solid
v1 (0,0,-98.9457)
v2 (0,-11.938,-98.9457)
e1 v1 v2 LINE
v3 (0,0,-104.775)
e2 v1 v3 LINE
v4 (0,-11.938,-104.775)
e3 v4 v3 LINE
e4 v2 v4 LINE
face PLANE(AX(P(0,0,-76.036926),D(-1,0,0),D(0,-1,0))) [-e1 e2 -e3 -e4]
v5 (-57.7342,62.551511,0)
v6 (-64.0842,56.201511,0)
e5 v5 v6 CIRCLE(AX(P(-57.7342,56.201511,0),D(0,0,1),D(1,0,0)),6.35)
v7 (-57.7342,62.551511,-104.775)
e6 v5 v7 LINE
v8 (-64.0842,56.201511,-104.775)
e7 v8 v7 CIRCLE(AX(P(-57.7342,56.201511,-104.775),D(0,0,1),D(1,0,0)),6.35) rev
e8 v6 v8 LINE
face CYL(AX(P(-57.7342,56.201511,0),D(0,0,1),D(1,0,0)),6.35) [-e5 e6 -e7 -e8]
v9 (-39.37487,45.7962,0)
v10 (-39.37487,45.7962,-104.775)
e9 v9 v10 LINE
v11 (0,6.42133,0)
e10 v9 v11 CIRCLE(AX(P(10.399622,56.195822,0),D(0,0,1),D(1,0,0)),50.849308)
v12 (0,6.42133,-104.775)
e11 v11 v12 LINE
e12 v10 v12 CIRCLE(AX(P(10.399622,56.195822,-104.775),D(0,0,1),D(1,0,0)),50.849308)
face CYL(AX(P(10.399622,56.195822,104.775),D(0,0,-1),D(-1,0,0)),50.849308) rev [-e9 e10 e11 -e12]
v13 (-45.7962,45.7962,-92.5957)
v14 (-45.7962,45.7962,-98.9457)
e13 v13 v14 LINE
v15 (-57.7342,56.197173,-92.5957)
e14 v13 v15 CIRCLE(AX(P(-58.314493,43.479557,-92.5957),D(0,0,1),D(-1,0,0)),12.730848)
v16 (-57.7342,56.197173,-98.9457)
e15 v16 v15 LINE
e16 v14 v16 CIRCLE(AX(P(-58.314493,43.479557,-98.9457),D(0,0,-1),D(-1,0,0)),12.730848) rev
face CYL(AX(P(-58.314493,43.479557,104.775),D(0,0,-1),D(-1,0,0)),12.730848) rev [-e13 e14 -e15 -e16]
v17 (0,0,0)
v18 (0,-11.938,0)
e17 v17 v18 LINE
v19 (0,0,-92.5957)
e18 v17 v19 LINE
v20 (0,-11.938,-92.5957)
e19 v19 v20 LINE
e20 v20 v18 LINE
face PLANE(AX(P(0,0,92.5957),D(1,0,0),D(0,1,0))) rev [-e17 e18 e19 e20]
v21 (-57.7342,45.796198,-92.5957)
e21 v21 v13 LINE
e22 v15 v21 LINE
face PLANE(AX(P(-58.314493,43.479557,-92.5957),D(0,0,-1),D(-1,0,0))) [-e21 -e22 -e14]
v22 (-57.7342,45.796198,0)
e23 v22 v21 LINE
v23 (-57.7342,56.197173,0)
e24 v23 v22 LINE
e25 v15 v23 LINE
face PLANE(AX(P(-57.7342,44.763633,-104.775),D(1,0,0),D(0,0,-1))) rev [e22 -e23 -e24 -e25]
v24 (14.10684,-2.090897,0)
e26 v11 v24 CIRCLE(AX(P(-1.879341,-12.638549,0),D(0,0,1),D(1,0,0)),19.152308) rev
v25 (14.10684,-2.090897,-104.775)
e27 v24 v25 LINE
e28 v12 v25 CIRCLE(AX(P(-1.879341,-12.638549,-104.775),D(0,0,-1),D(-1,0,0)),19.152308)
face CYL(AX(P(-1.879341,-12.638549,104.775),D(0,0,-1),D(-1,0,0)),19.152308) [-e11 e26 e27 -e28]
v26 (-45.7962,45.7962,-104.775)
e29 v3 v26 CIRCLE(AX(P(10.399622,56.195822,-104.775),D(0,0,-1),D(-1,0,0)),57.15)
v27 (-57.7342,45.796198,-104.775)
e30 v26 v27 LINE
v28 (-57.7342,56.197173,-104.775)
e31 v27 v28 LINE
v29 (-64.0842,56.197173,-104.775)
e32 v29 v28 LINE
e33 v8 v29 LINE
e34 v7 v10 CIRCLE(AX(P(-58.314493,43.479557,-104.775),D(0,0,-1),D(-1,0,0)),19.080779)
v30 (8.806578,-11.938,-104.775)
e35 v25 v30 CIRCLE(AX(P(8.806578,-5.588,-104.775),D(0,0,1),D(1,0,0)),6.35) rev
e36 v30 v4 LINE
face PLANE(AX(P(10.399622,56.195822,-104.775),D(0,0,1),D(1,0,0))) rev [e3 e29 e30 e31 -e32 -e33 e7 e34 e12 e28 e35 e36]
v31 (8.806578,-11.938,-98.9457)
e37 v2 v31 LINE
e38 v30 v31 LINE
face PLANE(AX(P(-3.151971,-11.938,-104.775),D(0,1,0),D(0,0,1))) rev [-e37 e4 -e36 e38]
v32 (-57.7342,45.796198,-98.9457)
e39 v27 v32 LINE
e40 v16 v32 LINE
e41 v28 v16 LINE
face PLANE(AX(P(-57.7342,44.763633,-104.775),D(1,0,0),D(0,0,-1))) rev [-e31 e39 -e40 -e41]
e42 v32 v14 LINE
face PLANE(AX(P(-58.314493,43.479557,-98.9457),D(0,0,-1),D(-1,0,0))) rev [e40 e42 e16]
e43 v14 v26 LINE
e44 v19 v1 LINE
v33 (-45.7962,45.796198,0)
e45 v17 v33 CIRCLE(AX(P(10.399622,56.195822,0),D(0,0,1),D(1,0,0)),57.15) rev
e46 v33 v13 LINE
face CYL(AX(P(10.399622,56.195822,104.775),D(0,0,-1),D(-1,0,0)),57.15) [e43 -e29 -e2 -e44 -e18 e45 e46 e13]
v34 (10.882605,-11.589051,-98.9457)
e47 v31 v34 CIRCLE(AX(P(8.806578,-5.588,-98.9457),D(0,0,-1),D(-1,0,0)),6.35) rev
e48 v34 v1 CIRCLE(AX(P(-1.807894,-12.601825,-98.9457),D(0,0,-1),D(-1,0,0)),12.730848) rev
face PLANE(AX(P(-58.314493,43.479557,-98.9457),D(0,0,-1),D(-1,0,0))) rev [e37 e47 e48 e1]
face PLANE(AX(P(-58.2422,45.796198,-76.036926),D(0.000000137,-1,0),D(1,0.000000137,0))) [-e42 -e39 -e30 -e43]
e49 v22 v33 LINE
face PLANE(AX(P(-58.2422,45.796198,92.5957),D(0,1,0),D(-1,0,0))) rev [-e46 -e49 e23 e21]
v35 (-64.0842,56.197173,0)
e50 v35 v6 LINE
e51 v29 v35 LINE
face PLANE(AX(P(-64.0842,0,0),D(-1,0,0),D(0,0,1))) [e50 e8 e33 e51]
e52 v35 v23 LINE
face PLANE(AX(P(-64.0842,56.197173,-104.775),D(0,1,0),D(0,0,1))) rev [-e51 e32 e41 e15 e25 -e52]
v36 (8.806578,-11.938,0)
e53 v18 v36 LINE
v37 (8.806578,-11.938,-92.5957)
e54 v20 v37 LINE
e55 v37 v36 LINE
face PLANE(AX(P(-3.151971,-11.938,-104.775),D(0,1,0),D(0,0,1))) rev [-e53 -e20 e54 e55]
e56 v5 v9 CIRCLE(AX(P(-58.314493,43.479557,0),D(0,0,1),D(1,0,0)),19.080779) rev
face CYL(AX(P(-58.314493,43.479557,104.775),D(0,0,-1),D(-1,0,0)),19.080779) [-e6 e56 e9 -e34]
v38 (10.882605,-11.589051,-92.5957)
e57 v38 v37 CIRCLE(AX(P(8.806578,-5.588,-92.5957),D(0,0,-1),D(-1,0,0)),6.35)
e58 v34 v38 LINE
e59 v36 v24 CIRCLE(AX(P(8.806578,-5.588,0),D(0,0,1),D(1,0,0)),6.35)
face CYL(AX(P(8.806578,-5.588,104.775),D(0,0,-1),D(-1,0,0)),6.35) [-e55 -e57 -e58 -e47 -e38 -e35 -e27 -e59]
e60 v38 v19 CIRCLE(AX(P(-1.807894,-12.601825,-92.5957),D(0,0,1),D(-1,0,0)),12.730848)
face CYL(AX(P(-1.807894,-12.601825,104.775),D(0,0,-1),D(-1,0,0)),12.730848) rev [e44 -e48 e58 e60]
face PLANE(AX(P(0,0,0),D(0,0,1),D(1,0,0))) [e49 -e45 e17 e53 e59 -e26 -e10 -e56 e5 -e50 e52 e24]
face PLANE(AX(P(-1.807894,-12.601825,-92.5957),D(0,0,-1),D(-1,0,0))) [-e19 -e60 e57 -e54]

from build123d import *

# Parameters (mm, degrees)
BOSS_EXTRUDE1_DEPTH = 104.775
BOSS_EXTRUDE2_DEPTH = 92.5957
BOSS_EXTRUDE3_START = -5.8293
BOSS_EXTRUDE3_DEPTH = 5.8293
BOSS_EXTRUDE4_DEPTH = 6.35
SKETCH5_W           = 7.787485422
SKETCH5_H           = 19.833751934
SKETCH5_W_2         = 22.754058967
SKETCH5_H_2         = 3.407024872
CUT_EXTRUDE1_DEPTH  = 227.312030137
SKETCH7_W           = 89.459387911
SKETCH7_H           = 93.108081787
CUT_EXTRUDE3_DEPTH  = 104.775
SKETCH8_W           = 104.775
SKETCH8_H           = 6.354337814
BOSS_EXTRUDE5_DEPTH = 6.35
FILLET1_R           = 6.35


with BuildPart() as part:
    # Sketch1 → Boss-Extrude1 (new, symmetric)
    with BuildSketch(Plane.XY):
        with BuildLine():
            Line((-58.2422, 56.2102), (-58.2422, 62.5602))
            ThreePointArc((-58.2422, 62.5602), (-45.640852469, 57.743322347), (-39.3748699, 45.7962))
            ThreePointArc((-39.3748699, 45.7962), (-25.556268964, 20.239931036), (0, 6.4213301))
            ThreePointArc((0, 6.4213301), (12.247457496, 0.293755183), (17.272, -12.446))
            Line((17.272, -12.446), (10.922, -12.446))
            ThreePointArc((10.922, -12.446), (7.760938146, -4.204686933), (0, 0))
            ThreePointArc((0, 0), (-30.011530905, 15.784669095), (-45.7962, 45.7962))
            ThreePointArc((-45.7962, 45.7962), (-50.144819563, 53.243313205), (-58.2422, 56.2102))
        make_face()
    extrude(amount=BOSS_EXTRUDE1_DEPTH, both=True)


with BuildPart() as boss_extrude2_tool:
    # Sketch2 → Boss-Extrude2 (new, symmetric)
    with BuildSketch(Plane.XY):
        with BuildLine():
            Line((-58.2422, 56.2102), (-58.2422, 45.796198296))
            Line((-58.2422, 45.796198296), (-45.796199685, 45.796198296))
            ThreePointArc((-45.796199685, 45.796198296), (-50.144818899, 53.243312648), (-58.2422, 56.2102))
        make_face()
        with BuildLine():
            Line((0, 0), (0, -12.446))
            Line((0, -12.446), (10.922, -12.446))
            ThreePointArc((10.922, -12.446), (7.760938146, -4.204686933), (0, 0))
        make_face()
    extrude(amount=BOSS_EXTRUDE2_DEPTH, both=True)


with BuildPart() as part_1:
    add(part.part)


with BuildPart() as part_2:
    # Boss-Extrude2: joined with boss_extrude2_tool
    add(part_1.part.fuse(boss_extrude2_tool.part, tol=0.00001))

    # Sketch3 → Boss-Extrude3 (add)
    with BuildSketch(Plane(origin=(0, 0, -104.775), x_dir=(-1, 0, 0), z_dir=(0, 0, -1)).offset(BOSS_EXTRUDE3_START)):
        with BuildLine():
            Line((58.2422, 56.2102), (58.2422, 45.796198296))
            Line((58.2422, 45.796198296), (45.7962, 45.7962))
            ThreePointArc((45.7962, 45.7962), (50.144819563, 53.243313205), (58.2422, 56.2102))
        make_face()
        with BuildLine():
            Line((0, 0), (0, -12.446))
            Line((0, -12.446), (-10.922, -12.446))
            ThreePointArc((-10.922, -12.446), (-7.760938146, -4.204686933), (0, 0))
        make_face()
    extrude(amount=BOSS_EXTRUDE3_DEPTH)

    # Sketch4 → Boss-Extrude4 (add)
    with BuildSketch(Plane.XY.offset(104.775)):
        with BuildLine():
            Line((-58.2422, 56.2102), (-58.2422, 45.796198296))
            Line((-58.2422, 45.796198296), (-45.7962, 45.7962))
            ThreePointArc((-45.7962, 45.7962), (-50.144819563, 53.243313205), (-58.2422, 56.2102))
        make_face()
        with BuildLine():
            Line((0, 0), (0, -12.446))
            Line((0, -12.446), (10.922, -12.446))
            ThreePointArc((10.922, -12.446), (7.760938146, -4.204686933), (0, 0))
        make_face()
    extrude(amount=-BOSS_EXTRUDE4_DEPTH)

    # Sketch5 → Cut-Extrude1 (cut, through all)
    with BuildSketch(Plane.XY.offset(104.775)):
        with Locations((-61.627942711, 54.680509116)):
            Rectangle(SKETCH5_W, SKETCH5_H)
        with Locations((8.225058429, -13.641512436)):
            Rectangle(SKETCH5_W_2, SKETCH5_H_2)
    extrude(amount=-CUT_EXTRUDE1_DEPTH, mode=Mode.SUBTRACT)

    # Sketch7 → Cut-Extrude3 (cut)
    with BuildSketch(Plane.XY.offset(104.775)):
        with Locations((-22.903611999, 28.130063449)):
            Rectangle(SKETCH7_W, SKETCH7_H)
    extrude(amount=-CUT_EXTRUDE3_DEPTH, mode=Mode.SUBTRACT)

    # Sketch8 → Boss-Extrude5 (add)
    with BuildSketch(Plane.ZY.offset(57.7342)):
        with Locations((-52.3875, 59.374341949)):
            Rectangle(SKETCH8_W, SKETCH8_H)
    extrude(amount=BOSS_EXTRUDE5_DEPTH)

    # Fillet1
    # the kernel refuses this fillet: 6.35 mm, written as the material it takes off along each edge
    with BuildSketch(Plane(origin=(17.260151367, -11.938, -130.624178653), x_dir=(-0.30497213299383213, 0.9523612749882223, 0), z_dir=(0, 0, 1))) as fillet1_piece_1:
        with BuildLine():
            CenterArc((8.625598356, 6.114282737), FILLET1_R, 162.243512631, 123.416753829)
            Line((2.57810426, 8.050855782), (0, 0))
            ThreePointArc((0, 0), (5.169835731, -0.710949564), (10.339671461, 0))
        make_face()
    extrude(amount=156.473357306, mode=Mode.SUBTRACT)
    with BuildSketch(Plane(origin=(-64.0842, 62.551510856, -120.65), x_dir=(1, 0, 0), z_dir=(0, 0, 1))) as fillet1_piece_2:
        with BuildLine():
            CenterArc((FILLET1_R, -FILLET1_R), FILLET1_R, 90, 90)
            Line((0, -FILLET1_R), (0, 0))
            Line((0, 0), (FILLET1_R, 0))
        make_face()
    extrude(amount=136.525, mode=Mode.SUBTRACT)


solid = part_2.part
